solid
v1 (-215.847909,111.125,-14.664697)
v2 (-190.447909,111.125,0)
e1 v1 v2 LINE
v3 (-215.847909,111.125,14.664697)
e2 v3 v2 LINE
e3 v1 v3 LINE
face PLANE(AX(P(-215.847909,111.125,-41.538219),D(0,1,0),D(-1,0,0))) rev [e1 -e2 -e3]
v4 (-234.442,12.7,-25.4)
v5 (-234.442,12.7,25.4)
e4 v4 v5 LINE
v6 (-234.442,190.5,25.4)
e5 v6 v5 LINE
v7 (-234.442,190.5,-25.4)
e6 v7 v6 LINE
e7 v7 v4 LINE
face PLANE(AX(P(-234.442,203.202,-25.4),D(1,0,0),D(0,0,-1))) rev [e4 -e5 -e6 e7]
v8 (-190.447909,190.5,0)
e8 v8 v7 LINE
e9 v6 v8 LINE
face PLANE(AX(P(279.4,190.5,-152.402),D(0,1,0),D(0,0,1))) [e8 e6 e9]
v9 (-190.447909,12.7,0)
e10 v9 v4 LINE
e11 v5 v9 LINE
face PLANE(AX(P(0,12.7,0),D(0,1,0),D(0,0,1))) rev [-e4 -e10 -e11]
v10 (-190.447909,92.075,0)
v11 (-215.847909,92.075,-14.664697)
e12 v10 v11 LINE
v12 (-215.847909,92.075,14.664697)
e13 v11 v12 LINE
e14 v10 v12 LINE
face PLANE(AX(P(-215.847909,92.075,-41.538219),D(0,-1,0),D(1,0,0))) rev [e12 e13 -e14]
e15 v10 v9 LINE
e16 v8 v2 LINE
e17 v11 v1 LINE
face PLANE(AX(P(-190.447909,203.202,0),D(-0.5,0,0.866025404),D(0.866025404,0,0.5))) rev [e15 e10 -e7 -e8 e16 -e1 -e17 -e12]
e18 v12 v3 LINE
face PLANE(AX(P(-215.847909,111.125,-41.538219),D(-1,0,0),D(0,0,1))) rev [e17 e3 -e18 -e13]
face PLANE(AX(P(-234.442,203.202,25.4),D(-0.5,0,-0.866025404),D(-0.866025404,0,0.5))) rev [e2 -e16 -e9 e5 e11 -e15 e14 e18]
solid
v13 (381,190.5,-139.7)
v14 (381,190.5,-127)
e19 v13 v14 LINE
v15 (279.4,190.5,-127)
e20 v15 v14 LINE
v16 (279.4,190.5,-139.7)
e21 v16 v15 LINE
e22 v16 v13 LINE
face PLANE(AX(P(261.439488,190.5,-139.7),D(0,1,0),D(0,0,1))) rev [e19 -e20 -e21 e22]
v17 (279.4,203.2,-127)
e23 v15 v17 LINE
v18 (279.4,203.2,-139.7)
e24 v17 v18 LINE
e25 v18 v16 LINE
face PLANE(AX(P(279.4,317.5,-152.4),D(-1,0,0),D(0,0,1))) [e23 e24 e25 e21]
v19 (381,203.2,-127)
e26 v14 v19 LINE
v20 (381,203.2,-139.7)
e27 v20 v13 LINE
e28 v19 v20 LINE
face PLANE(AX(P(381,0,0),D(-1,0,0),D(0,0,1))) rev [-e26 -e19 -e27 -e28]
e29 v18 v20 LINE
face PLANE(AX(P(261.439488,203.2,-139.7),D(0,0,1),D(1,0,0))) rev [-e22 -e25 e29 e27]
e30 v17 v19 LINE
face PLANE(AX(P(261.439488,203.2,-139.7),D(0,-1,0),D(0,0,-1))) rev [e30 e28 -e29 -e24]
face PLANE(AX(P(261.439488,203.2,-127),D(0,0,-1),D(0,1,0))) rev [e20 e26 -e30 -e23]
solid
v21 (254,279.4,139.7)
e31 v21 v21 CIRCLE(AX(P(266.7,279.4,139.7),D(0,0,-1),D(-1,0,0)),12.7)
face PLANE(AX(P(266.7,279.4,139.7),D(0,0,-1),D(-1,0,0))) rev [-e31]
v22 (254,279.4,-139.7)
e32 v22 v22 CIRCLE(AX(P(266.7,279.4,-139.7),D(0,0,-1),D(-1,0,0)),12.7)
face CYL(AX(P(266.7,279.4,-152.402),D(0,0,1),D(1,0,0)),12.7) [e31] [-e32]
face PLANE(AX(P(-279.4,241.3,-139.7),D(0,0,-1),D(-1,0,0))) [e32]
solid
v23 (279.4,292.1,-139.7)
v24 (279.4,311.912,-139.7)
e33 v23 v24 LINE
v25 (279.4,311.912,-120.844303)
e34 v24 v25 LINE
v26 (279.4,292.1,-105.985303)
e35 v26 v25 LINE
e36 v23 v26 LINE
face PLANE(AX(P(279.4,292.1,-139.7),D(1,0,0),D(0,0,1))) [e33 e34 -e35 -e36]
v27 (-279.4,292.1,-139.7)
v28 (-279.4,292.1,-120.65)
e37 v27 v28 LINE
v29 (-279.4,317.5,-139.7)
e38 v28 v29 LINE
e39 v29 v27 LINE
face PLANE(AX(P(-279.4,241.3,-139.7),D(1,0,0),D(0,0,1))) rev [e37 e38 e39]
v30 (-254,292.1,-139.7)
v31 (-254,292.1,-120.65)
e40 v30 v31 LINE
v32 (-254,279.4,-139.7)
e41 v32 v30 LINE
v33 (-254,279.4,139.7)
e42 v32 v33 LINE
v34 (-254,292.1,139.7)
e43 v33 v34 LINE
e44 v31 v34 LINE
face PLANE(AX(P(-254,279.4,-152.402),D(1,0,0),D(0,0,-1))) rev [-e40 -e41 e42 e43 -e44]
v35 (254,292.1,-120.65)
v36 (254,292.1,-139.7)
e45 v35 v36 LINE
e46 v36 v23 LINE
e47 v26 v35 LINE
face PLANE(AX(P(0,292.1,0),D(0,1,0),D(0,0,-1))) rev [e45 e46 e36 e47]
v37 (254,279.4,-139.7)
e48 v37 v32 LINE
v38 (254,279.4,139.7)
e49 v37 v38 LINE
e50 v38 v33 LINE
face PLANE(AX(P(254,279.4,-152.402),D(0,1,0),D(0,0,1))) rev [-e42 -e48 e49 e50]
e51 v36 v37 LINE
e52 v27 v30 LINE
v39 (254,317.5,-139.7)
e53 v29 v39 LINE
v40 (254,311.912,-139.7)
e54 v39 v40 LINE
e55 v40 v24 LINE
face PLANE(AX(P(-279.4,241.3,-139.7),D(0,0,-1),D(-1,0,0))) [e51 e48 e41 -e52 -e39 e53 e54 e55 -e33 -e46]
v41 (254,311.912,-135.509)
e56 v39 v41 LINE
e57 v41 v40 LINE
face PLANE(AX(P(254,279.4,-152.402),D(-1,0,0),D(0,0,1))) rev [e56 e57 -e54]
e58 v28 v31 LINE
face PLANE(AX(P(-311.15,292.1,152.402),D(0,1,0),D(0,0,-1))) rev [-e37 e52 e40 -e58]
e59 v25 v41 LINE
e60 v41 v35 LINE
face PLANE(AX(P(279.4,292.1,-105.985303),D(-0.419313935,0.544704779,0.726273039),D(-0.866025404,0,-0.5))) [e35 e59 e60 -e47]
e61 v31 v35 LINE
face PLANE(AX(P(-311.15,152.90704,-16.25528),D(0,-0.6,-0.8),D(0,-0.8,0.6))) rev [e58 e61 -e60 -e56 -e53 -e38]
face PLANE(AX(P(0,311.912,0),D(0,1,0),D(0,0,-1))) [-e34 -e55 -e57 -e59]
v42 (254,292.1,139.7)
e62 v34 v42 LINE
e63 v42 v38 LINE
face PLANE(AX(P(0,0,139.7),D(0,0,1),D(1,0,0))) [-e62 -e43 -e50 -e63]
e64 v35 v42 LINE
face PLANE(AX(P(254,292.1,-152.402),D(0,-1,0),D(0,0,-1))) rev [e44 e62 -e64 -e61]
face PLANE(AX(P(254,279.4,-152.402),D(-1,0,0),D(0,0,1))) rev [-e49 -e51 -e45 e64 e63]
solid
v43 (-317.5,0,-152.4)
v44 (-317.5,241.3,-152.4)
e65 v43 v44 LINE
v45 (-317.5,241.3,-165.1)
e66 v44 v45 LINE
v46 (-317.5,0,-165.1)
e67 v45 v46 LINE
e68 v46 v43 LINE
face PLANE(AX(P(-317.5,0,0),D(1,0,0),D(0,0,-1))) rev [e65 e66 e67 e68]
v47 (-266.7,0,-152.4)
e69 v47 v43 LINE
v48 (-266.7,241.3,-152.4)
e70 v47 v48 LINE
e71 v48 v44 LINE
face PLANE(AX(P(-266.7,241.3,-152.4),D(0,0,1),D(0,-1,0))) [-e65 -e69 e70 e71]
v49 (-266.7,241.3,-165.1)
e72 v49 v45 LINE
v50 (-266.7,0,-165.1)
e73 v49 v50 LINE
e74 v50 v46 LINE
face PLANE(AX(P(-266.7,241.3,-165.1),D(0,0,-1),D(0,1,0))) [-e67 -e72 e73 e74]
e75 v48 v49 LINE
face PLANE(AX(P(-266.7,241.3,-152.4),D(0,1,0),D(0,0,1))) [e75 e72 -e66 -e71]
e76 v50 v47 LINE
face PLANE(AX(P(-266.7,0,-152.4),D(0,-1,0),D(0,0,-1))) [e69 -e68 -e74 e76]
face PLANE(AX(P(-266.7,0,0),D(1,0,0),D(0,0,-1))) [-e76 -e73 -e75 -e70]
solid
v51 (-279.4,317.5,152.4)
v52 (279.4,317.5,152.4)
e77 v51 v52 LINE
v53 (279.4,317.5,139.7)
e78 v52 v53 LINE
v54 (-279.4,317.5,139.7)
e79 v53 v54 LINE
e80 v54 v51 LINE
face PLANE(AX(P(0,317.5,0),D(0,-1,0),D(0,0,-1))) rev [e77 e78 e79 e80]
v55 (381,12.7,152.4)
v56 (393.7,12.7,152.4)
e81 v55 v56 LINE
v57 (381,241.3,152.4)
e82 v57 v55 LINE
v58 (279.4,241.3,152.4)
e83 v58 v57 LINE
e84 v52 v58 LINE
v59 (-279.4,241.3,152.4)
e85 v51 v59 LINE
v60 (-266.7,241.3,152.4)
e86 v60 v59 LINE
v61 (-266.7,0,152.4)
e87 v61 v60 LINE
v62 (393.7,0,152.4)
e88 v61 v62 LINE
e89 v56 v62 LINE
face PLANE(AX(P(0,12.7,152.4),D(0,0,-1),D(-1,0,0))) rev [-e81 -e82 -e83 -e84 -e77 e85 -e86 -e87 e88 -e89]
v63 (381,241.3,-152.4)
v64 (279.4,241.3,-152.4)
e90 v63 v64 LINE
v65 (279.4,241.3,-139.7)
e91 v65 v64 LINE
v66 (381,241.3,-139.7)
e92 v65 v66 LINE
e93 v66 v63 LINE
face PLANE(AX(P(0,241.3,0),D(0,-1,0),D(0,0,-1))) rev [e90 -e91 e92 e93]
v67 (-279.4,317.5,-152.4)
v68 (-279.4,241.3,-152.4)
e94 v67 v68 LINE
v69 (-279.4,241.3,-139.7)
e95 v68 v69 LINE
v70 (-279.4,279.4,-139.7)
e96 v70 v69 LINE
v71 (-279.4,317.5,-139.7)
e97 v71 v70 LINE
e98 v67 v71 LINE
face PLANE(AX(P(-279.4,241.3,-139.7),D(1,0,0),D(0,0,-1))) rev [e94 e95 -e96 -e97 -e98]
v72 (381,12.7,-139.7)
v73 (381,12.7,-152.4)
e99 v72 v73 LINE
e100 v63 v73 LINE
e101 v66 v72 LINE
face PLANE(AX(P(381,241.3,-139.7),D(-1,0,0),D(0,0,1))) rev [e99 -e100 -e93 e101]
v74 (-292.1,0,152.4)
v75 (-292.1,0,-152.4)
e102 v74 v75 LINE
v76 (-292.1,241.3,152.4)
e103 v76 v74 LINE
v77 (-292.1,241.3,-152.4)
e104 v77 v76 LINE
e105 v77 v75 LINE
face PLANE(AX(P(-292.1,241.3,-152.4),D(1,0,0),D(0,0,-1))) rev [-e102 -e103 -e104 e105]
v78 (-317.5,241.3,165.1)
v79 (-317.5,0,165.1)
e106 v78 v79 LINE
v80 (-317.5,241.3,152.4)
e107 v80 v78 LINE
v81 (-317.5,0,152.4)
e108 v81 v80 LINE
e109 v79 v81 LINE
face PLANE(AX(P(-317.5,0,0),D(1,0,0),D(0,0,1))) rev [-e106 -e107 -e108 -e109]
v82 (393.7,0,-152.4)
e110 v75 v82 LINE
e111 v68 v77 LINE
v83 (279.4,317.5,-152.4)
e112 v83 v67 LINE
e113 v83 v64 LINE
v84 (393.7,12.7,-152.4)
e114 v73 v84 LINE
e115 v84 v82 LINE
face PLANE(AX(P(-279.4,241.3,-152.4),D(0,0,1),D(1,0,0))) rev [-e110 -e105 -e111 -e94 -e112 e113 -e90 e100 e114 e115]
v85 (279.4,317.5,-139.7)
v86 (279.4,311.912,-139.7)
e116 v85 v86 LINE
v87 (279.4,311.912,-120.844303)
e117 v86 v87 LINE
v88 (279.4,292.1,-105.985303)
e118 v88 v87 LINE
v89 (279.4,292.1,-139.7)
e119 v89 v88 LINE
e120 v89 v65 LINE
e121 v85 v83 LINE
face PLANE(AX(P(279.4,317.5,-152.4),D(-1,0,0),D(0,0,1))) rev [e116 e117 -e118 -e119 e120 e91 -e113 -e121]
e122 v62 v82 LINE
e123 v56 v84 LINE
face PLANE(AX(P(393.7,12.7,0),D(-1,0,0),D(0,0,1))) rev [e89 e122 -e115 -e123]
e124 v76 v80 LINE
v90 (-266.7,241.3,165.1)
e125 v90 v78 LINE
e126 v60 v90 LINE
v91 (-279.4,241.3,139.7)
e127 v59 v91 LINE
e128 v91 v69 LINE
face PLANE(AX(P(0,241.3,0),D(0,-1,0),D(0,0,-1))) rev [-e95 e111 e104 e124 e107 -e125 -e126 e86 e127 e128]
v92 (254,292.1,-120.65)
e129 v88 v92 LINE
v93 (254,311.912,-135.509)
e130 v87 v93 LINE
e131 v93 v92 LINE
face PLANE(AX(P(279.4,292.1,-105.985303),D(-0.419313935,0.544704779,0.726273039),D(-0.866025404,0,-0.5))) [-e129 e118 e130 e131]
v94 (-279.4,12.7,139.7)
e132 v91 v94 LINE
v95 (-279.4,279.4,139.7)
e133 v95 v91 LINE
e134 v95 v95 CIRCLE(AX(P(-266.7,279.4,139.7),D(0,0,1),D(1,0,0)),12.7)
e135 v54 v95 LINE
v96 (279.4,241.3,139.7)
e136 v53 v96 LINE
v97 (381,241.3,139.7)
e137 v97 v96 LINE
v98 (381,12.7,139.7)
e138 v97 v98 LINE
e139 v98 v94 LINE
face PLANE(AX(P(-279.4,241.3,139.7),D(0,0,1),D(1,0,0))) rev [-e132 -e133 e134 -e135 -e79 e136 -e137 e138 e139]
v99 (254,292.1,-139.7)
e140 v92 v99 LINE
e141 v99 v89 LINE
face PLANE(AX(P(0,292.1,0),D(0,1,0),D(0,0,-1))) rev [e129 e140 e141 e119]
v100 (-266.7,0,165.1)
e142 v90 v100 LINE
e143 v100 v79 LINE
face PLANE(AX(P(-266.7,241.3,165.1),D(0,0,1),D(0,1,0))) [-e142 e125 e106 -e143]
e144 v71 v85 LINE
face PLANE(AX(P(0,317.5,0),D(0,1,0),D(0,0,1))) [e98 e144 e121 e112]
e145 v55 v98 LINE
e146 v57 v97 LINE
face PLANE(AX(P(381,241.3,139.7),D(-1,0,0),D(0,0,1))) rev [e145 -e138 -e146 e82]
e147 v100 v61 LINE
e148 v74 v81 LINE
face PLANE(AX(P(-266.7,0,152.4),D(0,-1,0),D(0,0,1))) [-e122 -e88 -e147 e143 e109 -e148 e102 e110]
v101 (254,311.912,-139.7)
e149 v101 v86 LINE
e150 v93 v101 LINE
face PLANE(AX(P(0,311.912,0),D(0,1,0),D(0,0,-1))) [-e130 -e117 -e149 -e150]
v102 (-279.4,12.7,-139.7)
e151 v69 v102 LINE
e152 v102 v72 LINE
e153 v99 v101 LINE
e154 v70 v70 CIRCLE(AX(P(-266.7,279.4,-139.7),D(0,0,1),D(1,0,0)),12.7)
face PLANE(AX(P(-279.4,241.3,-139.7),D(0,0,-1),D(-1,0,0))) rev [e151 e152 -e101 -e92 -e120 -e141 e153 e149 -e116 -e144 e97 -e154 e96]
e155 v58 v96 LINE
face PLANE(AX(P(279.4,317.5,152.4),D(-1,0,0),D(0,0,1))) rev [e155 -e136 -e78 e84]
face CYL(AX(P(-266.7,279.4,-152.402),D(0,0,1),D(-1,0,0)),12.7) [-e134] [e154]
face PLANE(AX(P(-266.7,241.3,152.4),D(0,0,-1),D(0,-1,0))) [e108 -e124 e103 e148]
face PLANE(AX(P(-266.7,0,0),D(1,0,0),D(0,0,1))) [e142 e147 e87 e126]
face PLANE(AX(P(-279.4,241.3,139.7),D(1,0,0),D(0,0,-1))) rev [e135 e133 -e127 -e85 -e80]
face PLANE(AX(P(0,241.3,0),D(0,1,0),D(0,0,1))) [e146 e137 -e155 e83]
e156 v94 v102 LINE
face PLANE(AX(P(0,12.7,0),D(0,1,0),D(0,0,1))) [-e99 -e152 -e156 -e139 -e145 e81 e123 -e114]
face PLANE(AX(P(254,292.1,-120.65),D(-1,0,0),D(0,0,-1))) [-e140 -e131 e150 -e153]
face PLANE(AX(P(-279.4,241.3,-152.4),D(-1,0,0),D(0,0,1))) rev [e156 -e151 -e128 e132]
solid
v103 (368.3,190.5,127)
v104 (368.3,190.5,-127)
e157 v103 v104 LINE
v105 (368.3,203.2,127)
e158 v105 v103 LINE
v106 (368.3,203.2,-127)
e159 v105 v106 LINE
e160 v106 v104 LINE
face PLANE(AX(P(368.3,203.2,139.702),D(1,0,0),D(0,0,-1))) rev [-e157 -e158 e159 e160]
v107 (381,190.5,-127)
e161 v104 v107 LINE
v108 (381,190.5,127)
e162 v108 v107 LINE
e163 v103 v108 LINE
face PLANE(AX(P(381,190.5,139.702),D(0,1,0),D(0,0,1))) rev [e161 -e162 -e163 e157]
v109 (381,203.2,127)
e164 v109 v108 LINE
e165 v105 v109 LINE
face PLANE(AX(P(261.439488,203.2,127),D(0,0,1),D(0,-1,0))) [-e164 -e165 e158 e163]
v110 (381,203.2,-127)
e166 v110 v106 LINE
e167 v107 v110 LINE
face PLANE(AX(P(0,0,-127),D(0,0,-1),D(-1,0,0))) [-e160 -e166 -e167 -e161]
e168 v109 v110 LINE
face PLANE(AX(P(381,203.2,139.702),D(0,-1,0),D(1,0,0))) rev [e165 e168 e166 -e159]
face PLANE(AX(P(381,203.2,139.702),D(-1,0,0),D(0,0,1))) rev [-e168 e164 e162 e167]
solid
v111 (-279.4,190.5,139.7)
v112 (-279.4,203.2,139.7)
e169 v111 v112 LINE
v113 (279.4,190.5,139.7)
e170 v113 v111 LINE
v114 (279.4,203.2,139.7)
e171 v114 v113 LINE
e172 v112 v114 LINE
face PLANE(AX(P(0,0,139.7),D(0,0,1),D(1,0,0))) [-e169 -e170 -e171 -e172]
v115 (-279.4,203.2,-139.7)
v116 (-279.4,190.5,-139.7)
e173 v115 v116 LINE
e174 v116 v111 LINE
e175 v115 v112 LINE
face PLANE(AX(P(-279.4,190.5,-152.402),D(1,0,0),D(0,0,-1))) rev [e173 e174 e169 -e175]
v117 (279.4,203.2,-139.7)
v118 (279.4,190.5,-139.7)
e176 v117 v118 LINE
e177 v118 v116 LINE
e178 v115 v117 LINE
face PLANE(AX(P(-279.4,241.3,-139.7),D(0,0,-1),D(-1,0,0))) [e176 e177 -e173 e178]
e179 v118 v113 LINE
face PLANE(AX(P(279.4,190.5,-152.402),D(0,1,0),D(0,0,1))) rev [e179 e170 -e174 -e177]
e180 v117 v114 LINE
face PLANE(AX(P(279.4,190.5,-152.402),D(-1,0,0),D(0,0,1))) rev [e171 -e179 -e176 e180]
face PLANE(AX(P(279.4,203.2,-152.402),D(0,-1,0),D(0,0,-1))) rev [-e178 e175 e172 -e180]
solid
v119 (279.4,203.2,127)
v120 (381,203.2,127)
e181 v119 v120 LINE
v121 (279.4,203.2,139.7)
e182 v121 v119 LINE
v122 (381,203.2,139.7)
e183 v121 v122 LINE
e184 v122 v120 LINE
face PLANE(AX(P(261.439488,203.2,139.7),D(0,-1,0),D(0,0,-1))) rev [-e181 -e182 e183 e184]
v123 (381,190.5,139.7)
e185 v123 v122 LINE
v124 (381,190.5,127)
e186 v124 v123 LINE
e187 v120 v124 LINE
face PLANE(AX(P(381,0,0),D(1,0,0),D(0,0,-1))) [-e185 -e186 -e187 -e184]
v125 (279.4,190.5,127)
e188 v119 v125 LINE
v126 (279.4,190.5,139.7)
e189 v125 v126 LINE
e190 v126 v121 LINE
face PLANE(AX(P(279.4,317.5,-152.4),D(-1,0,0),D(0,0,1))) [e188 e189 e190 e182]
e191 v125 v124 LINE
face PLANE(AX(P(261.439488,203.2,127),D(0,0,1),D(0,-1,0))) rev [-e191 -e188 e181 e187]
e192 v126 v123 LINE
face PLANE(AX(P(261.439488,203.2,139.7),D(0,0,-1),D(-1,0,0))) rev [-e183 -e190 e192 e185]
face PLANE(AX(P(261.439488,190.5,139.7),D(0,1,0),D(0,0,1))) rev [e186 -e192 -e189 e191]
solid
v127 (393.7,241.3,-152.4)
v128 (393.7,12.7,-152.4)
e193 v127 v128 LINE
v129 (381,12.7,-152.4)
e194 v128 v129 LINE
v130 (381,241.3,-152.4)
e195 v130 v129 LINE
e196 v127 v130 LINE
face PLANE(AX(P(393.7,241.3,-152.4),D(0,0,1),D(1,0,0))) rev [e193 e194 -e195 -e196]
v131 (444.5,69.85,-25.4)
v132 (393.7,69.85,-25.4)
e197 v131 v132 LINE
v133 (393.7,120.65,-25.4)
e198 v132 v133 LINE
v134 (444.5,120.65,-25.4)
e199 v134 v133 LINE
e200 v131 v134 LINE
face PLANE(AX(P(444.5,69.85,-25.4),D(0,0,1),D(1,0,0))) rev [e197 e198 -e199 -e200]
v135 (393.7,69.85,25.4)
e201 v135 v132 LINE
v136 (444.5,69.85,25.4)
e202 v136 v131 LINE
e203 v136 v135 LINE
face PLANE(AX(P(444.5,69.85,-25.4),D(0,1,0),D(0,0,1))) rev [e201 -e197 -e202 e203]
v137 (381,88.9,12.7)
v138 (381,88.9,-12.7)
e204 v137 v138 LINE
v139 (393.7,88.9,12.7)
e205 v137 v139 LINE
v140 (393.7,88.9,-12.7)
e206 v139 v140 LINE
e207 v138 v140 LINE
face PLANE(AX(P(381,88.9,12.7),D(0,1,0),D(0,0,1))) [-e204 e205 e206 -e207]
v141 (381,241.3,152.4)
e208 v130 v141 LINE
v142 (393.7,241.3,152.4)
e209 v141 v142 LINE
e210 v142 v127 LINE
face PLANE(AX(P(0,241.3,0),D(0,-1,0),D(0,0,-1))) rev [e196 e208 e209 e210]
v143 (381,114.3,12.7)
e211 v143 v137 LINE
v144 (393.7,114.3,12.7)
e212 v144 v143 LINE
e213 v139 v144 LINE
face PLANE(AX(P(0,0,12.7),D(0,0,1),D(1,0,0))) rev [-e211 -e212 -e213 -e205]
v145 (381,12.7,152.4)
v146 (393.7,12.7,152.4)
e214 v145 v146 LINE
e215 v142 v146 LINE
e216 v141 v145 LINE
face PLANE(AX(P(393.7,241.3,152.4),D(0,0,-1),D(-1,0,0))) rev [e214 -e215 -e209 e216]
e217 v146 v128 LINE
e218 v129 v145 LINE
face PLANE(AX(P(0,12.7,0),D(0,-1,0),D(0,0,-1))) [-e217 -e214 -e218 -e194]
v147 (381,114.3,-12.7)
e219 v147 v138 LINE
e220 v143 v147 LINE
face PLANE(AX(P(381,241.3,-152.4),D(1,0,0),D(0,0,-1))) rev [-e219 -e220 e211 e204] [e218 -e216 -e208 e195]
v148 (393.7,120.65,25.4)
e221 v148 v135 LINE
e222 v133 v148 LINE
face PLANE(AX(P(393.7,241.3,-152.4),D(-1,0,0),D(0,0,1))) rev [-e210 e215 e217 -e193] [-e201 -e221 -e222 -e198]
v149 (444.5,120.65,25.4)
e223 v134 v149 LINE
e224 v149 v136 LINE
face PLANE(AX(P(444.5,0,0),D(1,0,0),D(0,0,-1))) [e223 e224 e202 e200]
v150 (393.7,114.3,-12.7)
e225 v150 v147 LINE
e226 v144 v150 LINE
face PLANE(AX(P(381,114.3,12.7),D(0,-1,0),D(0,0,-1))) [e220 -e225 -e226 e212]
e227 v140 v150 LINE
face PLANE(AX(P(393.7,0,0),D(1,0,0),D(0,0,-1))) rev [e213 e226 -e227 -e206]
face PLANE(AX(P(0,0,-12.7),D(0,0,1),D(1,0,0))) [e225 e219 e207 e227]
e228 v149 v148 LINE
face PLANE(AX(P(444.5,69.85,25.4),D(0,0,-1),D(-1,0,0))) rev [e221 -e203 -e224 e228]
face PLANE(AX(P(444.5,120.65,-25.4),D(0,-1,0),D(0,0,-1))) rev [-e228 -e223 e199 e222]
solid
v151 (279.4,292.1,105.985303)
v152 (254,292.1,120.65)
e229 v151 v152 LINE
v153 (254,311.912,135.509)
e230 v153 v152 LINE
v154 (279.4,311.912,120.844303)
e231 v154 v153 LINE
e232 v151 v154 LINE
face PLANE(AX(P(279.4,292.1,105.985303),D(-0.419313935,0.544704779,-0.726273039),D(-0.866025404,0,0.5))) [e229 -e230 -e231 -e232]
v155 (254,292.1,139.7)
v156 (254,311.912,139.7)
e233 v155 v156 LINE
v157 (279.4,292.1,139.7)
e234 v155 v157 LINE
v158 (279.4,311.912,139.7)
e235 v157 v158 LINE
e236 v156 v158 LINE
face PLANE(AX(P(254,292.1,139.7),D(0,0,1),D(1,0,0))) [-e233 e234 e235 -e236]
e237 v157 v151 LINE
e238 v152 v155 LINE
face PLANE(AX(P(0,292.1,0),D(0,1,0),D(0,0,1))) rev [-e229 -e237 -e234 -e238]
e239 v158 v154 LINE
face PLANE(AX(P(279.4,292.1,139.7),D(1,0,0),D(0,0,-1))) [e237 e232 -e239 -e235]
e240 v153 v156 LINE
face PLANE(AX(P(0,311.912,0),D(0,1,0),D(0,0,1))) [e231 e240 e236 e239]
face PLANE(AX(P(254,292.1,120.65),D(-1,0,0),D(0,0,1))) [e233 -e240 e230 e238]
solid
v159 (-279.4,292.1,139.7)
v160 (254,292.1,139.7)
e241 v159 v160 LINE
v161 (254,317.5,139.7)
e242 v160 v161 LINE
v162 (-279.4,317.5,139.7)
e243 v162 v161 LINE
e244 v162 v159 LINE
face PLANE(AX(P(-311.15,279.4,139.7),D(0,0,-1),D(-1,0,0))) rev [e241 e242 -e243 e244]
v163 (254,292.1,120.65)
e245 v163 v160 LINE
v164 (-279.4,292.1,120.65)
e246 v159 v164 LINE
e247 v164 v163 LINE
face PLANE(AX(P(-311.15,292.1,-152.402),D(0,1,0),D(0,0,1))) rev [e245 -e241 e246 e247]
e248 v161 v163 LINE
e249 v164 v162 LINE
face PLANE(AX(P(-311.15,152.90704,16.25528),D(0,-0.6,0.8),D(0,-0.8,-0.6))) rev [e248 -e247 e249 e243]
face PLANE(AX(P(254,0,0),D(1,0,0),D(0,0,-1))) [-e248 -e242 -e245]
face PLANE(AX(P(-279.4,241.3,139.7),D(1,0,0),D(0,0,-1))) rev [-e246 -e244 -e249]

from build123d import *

# Parameters (mm, degrees)
SKETCH1_W                             = 584.2
SKETCH1_H                             = 304.8
SKETCH1_W_2                           = 101.6
FOND_DEPTH                            = 12.7
SKETCH2_W                             = 660.4
SKETCH2_H                             = 12.7
COT_S_HAUT_DEPTH                      = 228.6
COT_S_HAUT_2_DEPTH                    = 228.6
SKETCH3_W                             = 12.7
SKETCH3_H                             = 304.8
COT_ES_BAS_DEPTH                      = 228.6
COT_ES_BAS_2_DEPTH                    = 228.6
SKETCH4_W                             = 558.8
SKETCH4_H                             = 12.7
SUPPORT_CAGE_DEPTH                    = 76.2
SKETCH5_W                             = 12.7
SKETCH5_H                             = 12.7
SUPPORT_TRAPPE_COT_ES_DEPTH           = 101.6
SUPPORT_TRAPPE_COT_ES_2_DEPTH         = 101.6
SUPPORT_TRAPPE_DEVANT_REACH           = 579.815
SKETCH6_W                             = 12.7
SKETCH6_H                             = 12.7
PLANCHER_MILLIEU_REACH                = 586.062
SKETCH7_W                             = 558.8
SKETCH7_H                             = 12.7
ROULEAU_REACH                         = 586.062
SKETCH8_R                             = 12.7
SKETCH10_W                            = 508
SKETCH10_H                            = 12.7
SOUTIEN_TAPIS_DEPTH                   = 279.4
REBORD_START                          = -25.4
REBORD_TAPIS_DEPTH                    = 533.4
V_POUR_VIS_SANS_FIN_DEPTH             = 177.8
TROU_V_VIS_SANS_FIN_REACH             = 530.235
SKETCH17_W                            = 25.4
SKETCH17_H                            = 19.05
TROU_V_VIS_SANS_FIN_DIRECTION_2_REACH = 530.235
TROU_SORTIE_VIS_SANS_FIN_DEPTH        = 12.7
TROU_SORTIE_VIS_SANS_FIN_DEPTH_BACK   = 12.7
SKETCH18_W                            = 12.7
SKETCH18_H                            = 25.4
SKETCH19_W                            = 12.7
SKETCH19_H                            = 241.3
REBORD_POUR_SAC_POUBELLE_DEPTH        = 25.4
SKETCH31_W                            = 50.8
SKETCH31_H                            = 50.8
BOITE_MOTEUR_VIS_SANS_DEPTH           = 50.8


with BuildPart() as part:
    # Sketch1 → Fond (new body)
    with BuildSketch(Plane(origin=(0, 0, 0), x_dir=(1, 0, 0), z_dir=(0, 1, 0))):
        Rectangle(SKETCH1_W, SKETCH1_H)
        with Locations((342.9, 0)):
            Rectangle(SKETCH1_W_2, SKETCH1_H)
    extrude(amount=FOND_DEPTH)


with BuildPart() as body_2:
    # Sketch2 → Cotés Haut (new body)
    with BuildSketch(Plane(origin=(0, 12.7, 0), x_dir=(1, 0, 0), z_dir=(0, 1, 0))):
        with Locations((50.8, 146.05)):
            Rectangle(SKETCH2_W, SKETCH2_H)
    extrude(amount=COT_S_HAUT_DEPTH)



with BuildPart() as body_3:
    # Sketch2 → Cot_s Haut 2 (new body)
    with BuildSketch(Plane(origin=(0, 12.7, 0), x_dir=(1, 0, 0), z_dir=(0, 1, 0))):
        with Locations((50.8, -146.05)):
            Rectangle(SKETCH2_W, SKETCH2_H)
    extrude(amount=COT_S_HAUT_2_DEPTH)


with BuildPart() as body_4:
    # Sketch3 → Cotées Bas (new body)
    with BuildSketch(Plane(origin=(0, 12.7, 0), x_dir=(1, 0, 0), z_dir=(0, 1, 0))):
        with Locations((-285.75, 0)):
            Rectangle(SKETCH3_W, SKETCH3_H)
    extrude(amount=COT_ES_BAS_DEPTH)


with BuildPart() as body_5:
    # Sketch3 → Cot_es Bas 2 (new body)
    with BuildSketch(Plane(origin=(0, 12.7, 0), x_dir=(1, 0, 0), z_dir=(0, 1, 0))):
        with Locations((387.35, 0)):
            Rectangle(SKETCH3_W, SKETCH3_H)
    extrude(amount=COT_ES_BAS_2_DEPTH)

    # Sketch18 → Trou sortie vis sans fin (cut, two sides: drawn at the far end of the back side and taken through both)
    with BuildSketch(Plane.XY.offset(-TROU_SORTIE_VIS_SANS_FIN_DEPTH_BACK)):
        with Locations((387.35, 101.6)):
            Rectangle(SKETCH18_W, SKETCH18_H)
    extrude(amount=TROU_SORTIE_VIS_SANS_FIN_DEPTH + TROU_SORTIE_VIS_SANS_FIN_DEPTH_BACK, mode=Mode.SUBTRACT)

    # Sketch31 → Boite moteur vis sans (add)
    with BuildSketch(Plane(origin=(393.7, 0, 0), x_dir=(0, 0, -1), z_dir=(1, 0, 0))):
        with Locations((0, 95.25)):
            Rectangle(SKETCH31_W, SKETCH31_H)
    extrude(amount=BOITE_MOTEUR_VIS_SANS_DEPTH)


with BuildPart() as body_2_1:
    add(body_2.part)

    add(body_3.part)  # Support Cage merges body 3
    # Sketch4 → Support Cage (add)
    with BuildSketch(Plane(origin=(0, 241.3, 0), x_dir=(1, 0, 0), z_dir=(0, 1, 0))):
        with Locations((0, 146.05)):
            Rectangle(SKETCH4_W, SKETCH4_H)
        with Locations((0, -146.05)):
            Rectangle(SKETCH4_W, SKETCH4_H)
    extrude(amount=SUPPORT_CAGE_DEPTH)


with BuildPart() as body_5_2:
    # Sketch5 → Support Trappe cotées (new body)
    with BuildSketch(Plane.ZY.offset(-381)):
        with Locations((-133.35, 196.85)):
            Rectangle(SKETCH5_W, SKETCH5_H)
    extrude(amount=SUPPORT_TRAPPE_COT_ES_DEPTH)


with BuildPart() as body_6:
    # Sketch5 → Support Trappe cot_es 2 (new body)
    with BuildSketch(Plane.ZY.offset(-381)):
        with Locations((133.35, 196.85)):
            Rectangle(SKETCH5_W, SKETCH5_H)
    extrude(amount=SUPPORT_TRAPPE_COT_ES_2_DEPTH)


with BuildPart() as body_7:

    # Sketch6 → Support Trappe devant (new, up to next)
    with BuildSketch(Plane.XY.offset(-127), mode=Mode.PRIVATE) as support_trappe_devant_sk1:
        with Locations((374.65, 196.85)):
            Rectangle(SKETCH6_W, SKETCH6_H)
    support_trappe_devant_tool1 = extrude(support_trappe_devant_sk1.sketch, amount=SUPPORT_TRAPPE_DEVANT_REACH, mode=Mode.PRIVATE) - body_6.part
    add(support_trappe_devant_tool1.solids().sort_by_distance((374.65, 196.85, -127))[0])


with BuildPart() as body_8:

    # Sketch7 → Plancher millieu (new, up to next)
    with BuildSketch(Plane(origin=(0, 0, 139.7), x_dir=(-1, 0, 0), z_dir=(0, 0, -1)), mode=Mode.PRIVATE) as plancher_millieu_sk1:
        with Locations((0, 196.85)):
            Rectangle(SKETCH7_W, SKETCH7_H)
    plancher_millieu_tool1 = extrude(plancher_millieu_sk1.sketch, amount=PLANCHER_MILLIEU_REACH, mode=Mode.PRIVATE) - body_2_1.part
    add(plancher_millieu_tool1.solids().sort_by_distance((0, 196.85, 139.7))[0])


with BuildPart() as body_9:

    # Sketch8 → Rouleau (new, up to next)
    with BuildSketch(Plane(origin=(0, 0, 139.7), x_dir=(-1, 0, 0), z_dir=(0, 0, -1)), mode=Mode.PRIVATE) as rouleau_sk1:
        with Locations((-266.7, 279.4)):
            Circle(SKETCH8_R)
    rouleau_tool1 = extrude(rouleau_sk1.sketch, amount=ROULEAU_REACH, mode=Mode.PRIVATE) - body_2_1.part
    rouleau = rouleau_tool1.solids().sort_by_distance((266.7, 279.4, 139.7))[0]
    add(rouleau)


with BuildPart() as body_2_2:
    add(body_2_1.part)

    # Mirror1: Rouleau across plane
    add(rouleau.mirror(Plane(origin=(0, 0, 0), x_dir=(0, 0, 1), z_dir=(1, 0, 0))))

    # Mirror9 2: loft between two sections, ruled curve by curve
    mirror9_2_from = [
        Edge.make_line((279.4, 311.912, -120.844303163), (279.4, 311.912, -139.7)),
        Edge.make_line((279.4, 292.1, -139.7), (279.4, 292.1, -105.985303163)),
        Edge.make_line((279.4, 292.1, -105.985303163), (279.4, 311.912, -120.844303163)),
        Edge.make_line((279.4, 292.1, -139.7), (279.4, 311.912, -139.7)),
    ]
    mirror9_2_to = [
        Edge.make_line((254, 311.912, -135.509), (254, 311.912, -139.7)),
        Edge.make_line((254, 292.1, -139.7), (254, 292.1, -120.65)),
        Edge.make_line((254, 292.1, -120.65), (254, 311.912, -135.509)),
        Edge.make_line((254, 292.1, -139.7), (254, 311.912, -139.7)),
    ]
    mirror9_2 = Solid(Shell([*[Face.make_surface_from_curves(mirror9_2_from[k], mirror9_2_to[k]) for k in range(4)], Face(Wire(mirror9_2_from)), Face(Wire(mirror9_2_to))]))
    add(mirror9_2)


with BuildPart() as body_10:
    # Sketch10 → Soutien tapis (new body)
    with BuildSketch(Plane(origin=(0, 0, 139.7), x_dir=(-1, 0, 0), z_dir=(0, 0, -1))):
        with Locations((0, 285.75)):
            Rectangle(SKETCH10_W, SKETCH10_H)
    extrude(amount=SOUTIEN_TAPIS_DEPTH)


with BuildPart() as body_11:
    # Sketch11 → Rebord tapis (new body)
    with BuildSketch(Plane(origin=(279.4, 0, 0), x_dir=(0, 0, -1), z_dir=(1, 0, 0)).offset(REBORD_START)):
        Polygon((-139.7, 317.5), (-120.65, 292.1), (-139.7, 292.1), align=None)
    rebord_tapis = extrude(amount=-REBORD_TAPIS_DEPTH)


with BuildPart() as body_10_1:
    add(body_10.part)

    # Mirror5: Rebord tapis across plane
    add(rebord_tapis.mirror(Plane.XY))

    # Mirror9: read off the stored shape, not the designer's step
    # Mirror9: loft between two sections, ruled curve by curve
    mirror9_from = [
        Edge.make_line((279.4, 292.1, -139.7), (279.4, 292.1, -105.985303163)),
        Edge.make_line((279.4, 311.912, -120.844303163), (279.4, 311.912, -139.7)),
        Edge.make_line((279.4, 292.1, -105.985303163), (279.4, 311.912, -120.844303163)),
        Edge.make_line((279.4, 311.912, -139.7), (279.4, 292.1, -139.7)),
    ]
    mirror9_to = [
        Edge.make_line((254, 292.1, -139.7), (254, 292.1, -120.65)),
        Edge.make_line((254, 311.912, -135.509), (254, 311.912, -139.7)),
        Edge.make_line((254, 292.1, -120.65), (254, 311.912, -135.509)),
        Edge.make_line((254, 311.912, -139.7), (254, 292.1, -139.7)),
    ]
    mirror9 = Solid(Shell([*[Face.make_surface_from_curves(mirror9_from[k], mirror9_to[k]) for k in range(4)], Face(Wire(mirror9_from)), Face(Wire(mirror9_to))]))
    add(mirror9)


with BuildPart() as body_12:
    # Sketch13 → V pour vis sans fin (new body)
    with BuildSketch(Plane(origin=(0, 12.7, 0), x_dir=(1, 0, 0), z_dir=(0, 1, 0))):
        Polygon((-190.447909488, 0), (-234.442, 25.4), (-234.442, -25.4), align=None)
    extrude(amount=V_POUR_VIS_SANS_FIN_DEPTH)

    # Trou V vis sans fin: up to this face of the body (flat: up to its plane)
    trou_v_vis_sans_fin_end = Plane(body_12.part.faces().sort_by_distance((-212.444954744, 101.6, -12.7))[0])
    # Sketch17 → Trou V vis sans fin (cut, up to the picked face)
    with BuildSketch(Plane.XY, mode=Mode.PRIVATE) as trou_v_vis_sans_fin_sk1:
        with Locations((-203.147909488, 101.6)):
            Rectangle(SKETCH17_W, SKETCH17_H)
    trou_v_vis_sans_fin_tool1 = split(extrude(trou_v_vis_sans_fin_sk1.sketch, amount=-TROU_V_VIS_SANS_FIN_REACH, mode=Mode.PRIVATE), bisect_by=trou_v_vis_sans_fin_end, keep=Keep.BOTH, mode=Mode.PRIVATE)
    add(trou_v_vis_sans_fin_tool1.solids().sort_by(Axis((-203.147909, 101.6, 0), (0, 0, -1)))[0], mode=Mode.SUBTRACT)

    # Trou V vis sans fin direction 2: up to this face of the body (flat: up to its plane)
    trou_v_vis_sans_fin_direction_2_end = Plane(body_12.part.faces().sort_by_distance((-212.444954744, 101.6, 12.7))[0])
    # Sketch17 → Trou V vis sans fin direction 2 (cut, up to the picked face)
    with BuildSketch(Plane.XY, mode=Mode.PRIVATE) as trou_v_vis_sans_fin_direction_2_sk1:
        with Locations((-203.147909488, 101.6)):
            Rectangle(SKETCH17_W, SKETCH17_H)
    trou_v_vis_sans_fin_direction_2_tool1 = split(extrude(trou_v_vis_sans_fin_direction_2_sk1.sketch, amount=TROU_V_VIS_SANS_FIN_DIRECTION_2_REACH, mode=Mode.PRIVATE), bisect_by=trou_v_vis_sans_fin_direction_2_end, keep=Keep.BOTH, mode=Mode.PRIVATE)
    add(trou_v_vis_sans_fin_direction_2_tool1.solids().sort_by(Axis((-203.147909, 101.6, 0), (0, 0, 1)))[0], mode=Mode.SUBTRACT)


with BuildPart() as body_13:
    # Sketch19 → Rebord pour sac poubelle (new, symmetric)
    with BuildSketch(Plane.ZY.offset(292.1)):
        with Locations((-158.75, 120.65)):
            Rectangle(SKETCH19_W, SKETCH19_H)
    rebord_pour_sac_poubelle = extrude(amount=REBORD_POUR_SAC_POUBELLE_DEPTH, both=True)


with BuildPart() as body_14:
    # Rebord pour sac poubelle 2: read off the stored shape, not the designer's step
    # Rebord pour sac poubelle 2: loft between two sections, ruled curve by curve
    rebord_pour_sac_poubelle_2_from = [
        Edge.make_line((254, 292.1, 120.65), (254, 292.1, 139.7)),
        Edge.make_line((254, 292.1, 139.7), (279.4, 292.1, 139.7)),
        Edge.make_line((279.4, 292.1, 105.985303163), (254, 292.1, 120.65)),
        Edge.make_line((279.4, 292.1, 139.7), (279.4, 292.1, 105.985303163)),
    ]
    rebord_pour_sac_poubelle_2_to = [
        Edge.make_line((254, 311.912, 135.509), (254, 311.912, 139.7)),
        Edge.make_line((254, 311.912, 139.7), (279.4, 311.912, 139.7)),
        Edge.make_line((279.4, 311.912, 120.844303163), (254, 311.912, 135.509)),
        Edge.make_line((279.4, 311.912, 139.7), (279.4, 311.912, 120.844303163)),
    ]
    rebord_pour_sac_poubelle_2 = Solid(Shell([*[Face.make_surface_from_curves(rebord_pour_sac_poubelle_2_from[k], rebord_pour_sac_poubelle_2_to[k]) for k in range(4)], Face(Wire(rebord_pour_sac_poubelle_2_from)), Face(Wire(rebord_pour_sac_poubelle_2_to))]))
    add(rebord_pour_sac_poubelle_2)


with BuildPart() as part_1:
    add(part.part)

    add(body_2_2.part)  # Mirror11 merges body 2

    add(body_4.part)  # Mirror11 merges body 4
    # Mirror11: Rebord pour sac poubelle across plane
    add(rebord_pour_sac_poubelle.mirror(Plane.XY))


solid = Compound([body_5.part, body_5_2.part, body_6.part, body_7.part, body_8.part, body_9.part, body_11.part, body_10_1.part, body_12.part, body_13.part, body_14.part, part_1.part])
